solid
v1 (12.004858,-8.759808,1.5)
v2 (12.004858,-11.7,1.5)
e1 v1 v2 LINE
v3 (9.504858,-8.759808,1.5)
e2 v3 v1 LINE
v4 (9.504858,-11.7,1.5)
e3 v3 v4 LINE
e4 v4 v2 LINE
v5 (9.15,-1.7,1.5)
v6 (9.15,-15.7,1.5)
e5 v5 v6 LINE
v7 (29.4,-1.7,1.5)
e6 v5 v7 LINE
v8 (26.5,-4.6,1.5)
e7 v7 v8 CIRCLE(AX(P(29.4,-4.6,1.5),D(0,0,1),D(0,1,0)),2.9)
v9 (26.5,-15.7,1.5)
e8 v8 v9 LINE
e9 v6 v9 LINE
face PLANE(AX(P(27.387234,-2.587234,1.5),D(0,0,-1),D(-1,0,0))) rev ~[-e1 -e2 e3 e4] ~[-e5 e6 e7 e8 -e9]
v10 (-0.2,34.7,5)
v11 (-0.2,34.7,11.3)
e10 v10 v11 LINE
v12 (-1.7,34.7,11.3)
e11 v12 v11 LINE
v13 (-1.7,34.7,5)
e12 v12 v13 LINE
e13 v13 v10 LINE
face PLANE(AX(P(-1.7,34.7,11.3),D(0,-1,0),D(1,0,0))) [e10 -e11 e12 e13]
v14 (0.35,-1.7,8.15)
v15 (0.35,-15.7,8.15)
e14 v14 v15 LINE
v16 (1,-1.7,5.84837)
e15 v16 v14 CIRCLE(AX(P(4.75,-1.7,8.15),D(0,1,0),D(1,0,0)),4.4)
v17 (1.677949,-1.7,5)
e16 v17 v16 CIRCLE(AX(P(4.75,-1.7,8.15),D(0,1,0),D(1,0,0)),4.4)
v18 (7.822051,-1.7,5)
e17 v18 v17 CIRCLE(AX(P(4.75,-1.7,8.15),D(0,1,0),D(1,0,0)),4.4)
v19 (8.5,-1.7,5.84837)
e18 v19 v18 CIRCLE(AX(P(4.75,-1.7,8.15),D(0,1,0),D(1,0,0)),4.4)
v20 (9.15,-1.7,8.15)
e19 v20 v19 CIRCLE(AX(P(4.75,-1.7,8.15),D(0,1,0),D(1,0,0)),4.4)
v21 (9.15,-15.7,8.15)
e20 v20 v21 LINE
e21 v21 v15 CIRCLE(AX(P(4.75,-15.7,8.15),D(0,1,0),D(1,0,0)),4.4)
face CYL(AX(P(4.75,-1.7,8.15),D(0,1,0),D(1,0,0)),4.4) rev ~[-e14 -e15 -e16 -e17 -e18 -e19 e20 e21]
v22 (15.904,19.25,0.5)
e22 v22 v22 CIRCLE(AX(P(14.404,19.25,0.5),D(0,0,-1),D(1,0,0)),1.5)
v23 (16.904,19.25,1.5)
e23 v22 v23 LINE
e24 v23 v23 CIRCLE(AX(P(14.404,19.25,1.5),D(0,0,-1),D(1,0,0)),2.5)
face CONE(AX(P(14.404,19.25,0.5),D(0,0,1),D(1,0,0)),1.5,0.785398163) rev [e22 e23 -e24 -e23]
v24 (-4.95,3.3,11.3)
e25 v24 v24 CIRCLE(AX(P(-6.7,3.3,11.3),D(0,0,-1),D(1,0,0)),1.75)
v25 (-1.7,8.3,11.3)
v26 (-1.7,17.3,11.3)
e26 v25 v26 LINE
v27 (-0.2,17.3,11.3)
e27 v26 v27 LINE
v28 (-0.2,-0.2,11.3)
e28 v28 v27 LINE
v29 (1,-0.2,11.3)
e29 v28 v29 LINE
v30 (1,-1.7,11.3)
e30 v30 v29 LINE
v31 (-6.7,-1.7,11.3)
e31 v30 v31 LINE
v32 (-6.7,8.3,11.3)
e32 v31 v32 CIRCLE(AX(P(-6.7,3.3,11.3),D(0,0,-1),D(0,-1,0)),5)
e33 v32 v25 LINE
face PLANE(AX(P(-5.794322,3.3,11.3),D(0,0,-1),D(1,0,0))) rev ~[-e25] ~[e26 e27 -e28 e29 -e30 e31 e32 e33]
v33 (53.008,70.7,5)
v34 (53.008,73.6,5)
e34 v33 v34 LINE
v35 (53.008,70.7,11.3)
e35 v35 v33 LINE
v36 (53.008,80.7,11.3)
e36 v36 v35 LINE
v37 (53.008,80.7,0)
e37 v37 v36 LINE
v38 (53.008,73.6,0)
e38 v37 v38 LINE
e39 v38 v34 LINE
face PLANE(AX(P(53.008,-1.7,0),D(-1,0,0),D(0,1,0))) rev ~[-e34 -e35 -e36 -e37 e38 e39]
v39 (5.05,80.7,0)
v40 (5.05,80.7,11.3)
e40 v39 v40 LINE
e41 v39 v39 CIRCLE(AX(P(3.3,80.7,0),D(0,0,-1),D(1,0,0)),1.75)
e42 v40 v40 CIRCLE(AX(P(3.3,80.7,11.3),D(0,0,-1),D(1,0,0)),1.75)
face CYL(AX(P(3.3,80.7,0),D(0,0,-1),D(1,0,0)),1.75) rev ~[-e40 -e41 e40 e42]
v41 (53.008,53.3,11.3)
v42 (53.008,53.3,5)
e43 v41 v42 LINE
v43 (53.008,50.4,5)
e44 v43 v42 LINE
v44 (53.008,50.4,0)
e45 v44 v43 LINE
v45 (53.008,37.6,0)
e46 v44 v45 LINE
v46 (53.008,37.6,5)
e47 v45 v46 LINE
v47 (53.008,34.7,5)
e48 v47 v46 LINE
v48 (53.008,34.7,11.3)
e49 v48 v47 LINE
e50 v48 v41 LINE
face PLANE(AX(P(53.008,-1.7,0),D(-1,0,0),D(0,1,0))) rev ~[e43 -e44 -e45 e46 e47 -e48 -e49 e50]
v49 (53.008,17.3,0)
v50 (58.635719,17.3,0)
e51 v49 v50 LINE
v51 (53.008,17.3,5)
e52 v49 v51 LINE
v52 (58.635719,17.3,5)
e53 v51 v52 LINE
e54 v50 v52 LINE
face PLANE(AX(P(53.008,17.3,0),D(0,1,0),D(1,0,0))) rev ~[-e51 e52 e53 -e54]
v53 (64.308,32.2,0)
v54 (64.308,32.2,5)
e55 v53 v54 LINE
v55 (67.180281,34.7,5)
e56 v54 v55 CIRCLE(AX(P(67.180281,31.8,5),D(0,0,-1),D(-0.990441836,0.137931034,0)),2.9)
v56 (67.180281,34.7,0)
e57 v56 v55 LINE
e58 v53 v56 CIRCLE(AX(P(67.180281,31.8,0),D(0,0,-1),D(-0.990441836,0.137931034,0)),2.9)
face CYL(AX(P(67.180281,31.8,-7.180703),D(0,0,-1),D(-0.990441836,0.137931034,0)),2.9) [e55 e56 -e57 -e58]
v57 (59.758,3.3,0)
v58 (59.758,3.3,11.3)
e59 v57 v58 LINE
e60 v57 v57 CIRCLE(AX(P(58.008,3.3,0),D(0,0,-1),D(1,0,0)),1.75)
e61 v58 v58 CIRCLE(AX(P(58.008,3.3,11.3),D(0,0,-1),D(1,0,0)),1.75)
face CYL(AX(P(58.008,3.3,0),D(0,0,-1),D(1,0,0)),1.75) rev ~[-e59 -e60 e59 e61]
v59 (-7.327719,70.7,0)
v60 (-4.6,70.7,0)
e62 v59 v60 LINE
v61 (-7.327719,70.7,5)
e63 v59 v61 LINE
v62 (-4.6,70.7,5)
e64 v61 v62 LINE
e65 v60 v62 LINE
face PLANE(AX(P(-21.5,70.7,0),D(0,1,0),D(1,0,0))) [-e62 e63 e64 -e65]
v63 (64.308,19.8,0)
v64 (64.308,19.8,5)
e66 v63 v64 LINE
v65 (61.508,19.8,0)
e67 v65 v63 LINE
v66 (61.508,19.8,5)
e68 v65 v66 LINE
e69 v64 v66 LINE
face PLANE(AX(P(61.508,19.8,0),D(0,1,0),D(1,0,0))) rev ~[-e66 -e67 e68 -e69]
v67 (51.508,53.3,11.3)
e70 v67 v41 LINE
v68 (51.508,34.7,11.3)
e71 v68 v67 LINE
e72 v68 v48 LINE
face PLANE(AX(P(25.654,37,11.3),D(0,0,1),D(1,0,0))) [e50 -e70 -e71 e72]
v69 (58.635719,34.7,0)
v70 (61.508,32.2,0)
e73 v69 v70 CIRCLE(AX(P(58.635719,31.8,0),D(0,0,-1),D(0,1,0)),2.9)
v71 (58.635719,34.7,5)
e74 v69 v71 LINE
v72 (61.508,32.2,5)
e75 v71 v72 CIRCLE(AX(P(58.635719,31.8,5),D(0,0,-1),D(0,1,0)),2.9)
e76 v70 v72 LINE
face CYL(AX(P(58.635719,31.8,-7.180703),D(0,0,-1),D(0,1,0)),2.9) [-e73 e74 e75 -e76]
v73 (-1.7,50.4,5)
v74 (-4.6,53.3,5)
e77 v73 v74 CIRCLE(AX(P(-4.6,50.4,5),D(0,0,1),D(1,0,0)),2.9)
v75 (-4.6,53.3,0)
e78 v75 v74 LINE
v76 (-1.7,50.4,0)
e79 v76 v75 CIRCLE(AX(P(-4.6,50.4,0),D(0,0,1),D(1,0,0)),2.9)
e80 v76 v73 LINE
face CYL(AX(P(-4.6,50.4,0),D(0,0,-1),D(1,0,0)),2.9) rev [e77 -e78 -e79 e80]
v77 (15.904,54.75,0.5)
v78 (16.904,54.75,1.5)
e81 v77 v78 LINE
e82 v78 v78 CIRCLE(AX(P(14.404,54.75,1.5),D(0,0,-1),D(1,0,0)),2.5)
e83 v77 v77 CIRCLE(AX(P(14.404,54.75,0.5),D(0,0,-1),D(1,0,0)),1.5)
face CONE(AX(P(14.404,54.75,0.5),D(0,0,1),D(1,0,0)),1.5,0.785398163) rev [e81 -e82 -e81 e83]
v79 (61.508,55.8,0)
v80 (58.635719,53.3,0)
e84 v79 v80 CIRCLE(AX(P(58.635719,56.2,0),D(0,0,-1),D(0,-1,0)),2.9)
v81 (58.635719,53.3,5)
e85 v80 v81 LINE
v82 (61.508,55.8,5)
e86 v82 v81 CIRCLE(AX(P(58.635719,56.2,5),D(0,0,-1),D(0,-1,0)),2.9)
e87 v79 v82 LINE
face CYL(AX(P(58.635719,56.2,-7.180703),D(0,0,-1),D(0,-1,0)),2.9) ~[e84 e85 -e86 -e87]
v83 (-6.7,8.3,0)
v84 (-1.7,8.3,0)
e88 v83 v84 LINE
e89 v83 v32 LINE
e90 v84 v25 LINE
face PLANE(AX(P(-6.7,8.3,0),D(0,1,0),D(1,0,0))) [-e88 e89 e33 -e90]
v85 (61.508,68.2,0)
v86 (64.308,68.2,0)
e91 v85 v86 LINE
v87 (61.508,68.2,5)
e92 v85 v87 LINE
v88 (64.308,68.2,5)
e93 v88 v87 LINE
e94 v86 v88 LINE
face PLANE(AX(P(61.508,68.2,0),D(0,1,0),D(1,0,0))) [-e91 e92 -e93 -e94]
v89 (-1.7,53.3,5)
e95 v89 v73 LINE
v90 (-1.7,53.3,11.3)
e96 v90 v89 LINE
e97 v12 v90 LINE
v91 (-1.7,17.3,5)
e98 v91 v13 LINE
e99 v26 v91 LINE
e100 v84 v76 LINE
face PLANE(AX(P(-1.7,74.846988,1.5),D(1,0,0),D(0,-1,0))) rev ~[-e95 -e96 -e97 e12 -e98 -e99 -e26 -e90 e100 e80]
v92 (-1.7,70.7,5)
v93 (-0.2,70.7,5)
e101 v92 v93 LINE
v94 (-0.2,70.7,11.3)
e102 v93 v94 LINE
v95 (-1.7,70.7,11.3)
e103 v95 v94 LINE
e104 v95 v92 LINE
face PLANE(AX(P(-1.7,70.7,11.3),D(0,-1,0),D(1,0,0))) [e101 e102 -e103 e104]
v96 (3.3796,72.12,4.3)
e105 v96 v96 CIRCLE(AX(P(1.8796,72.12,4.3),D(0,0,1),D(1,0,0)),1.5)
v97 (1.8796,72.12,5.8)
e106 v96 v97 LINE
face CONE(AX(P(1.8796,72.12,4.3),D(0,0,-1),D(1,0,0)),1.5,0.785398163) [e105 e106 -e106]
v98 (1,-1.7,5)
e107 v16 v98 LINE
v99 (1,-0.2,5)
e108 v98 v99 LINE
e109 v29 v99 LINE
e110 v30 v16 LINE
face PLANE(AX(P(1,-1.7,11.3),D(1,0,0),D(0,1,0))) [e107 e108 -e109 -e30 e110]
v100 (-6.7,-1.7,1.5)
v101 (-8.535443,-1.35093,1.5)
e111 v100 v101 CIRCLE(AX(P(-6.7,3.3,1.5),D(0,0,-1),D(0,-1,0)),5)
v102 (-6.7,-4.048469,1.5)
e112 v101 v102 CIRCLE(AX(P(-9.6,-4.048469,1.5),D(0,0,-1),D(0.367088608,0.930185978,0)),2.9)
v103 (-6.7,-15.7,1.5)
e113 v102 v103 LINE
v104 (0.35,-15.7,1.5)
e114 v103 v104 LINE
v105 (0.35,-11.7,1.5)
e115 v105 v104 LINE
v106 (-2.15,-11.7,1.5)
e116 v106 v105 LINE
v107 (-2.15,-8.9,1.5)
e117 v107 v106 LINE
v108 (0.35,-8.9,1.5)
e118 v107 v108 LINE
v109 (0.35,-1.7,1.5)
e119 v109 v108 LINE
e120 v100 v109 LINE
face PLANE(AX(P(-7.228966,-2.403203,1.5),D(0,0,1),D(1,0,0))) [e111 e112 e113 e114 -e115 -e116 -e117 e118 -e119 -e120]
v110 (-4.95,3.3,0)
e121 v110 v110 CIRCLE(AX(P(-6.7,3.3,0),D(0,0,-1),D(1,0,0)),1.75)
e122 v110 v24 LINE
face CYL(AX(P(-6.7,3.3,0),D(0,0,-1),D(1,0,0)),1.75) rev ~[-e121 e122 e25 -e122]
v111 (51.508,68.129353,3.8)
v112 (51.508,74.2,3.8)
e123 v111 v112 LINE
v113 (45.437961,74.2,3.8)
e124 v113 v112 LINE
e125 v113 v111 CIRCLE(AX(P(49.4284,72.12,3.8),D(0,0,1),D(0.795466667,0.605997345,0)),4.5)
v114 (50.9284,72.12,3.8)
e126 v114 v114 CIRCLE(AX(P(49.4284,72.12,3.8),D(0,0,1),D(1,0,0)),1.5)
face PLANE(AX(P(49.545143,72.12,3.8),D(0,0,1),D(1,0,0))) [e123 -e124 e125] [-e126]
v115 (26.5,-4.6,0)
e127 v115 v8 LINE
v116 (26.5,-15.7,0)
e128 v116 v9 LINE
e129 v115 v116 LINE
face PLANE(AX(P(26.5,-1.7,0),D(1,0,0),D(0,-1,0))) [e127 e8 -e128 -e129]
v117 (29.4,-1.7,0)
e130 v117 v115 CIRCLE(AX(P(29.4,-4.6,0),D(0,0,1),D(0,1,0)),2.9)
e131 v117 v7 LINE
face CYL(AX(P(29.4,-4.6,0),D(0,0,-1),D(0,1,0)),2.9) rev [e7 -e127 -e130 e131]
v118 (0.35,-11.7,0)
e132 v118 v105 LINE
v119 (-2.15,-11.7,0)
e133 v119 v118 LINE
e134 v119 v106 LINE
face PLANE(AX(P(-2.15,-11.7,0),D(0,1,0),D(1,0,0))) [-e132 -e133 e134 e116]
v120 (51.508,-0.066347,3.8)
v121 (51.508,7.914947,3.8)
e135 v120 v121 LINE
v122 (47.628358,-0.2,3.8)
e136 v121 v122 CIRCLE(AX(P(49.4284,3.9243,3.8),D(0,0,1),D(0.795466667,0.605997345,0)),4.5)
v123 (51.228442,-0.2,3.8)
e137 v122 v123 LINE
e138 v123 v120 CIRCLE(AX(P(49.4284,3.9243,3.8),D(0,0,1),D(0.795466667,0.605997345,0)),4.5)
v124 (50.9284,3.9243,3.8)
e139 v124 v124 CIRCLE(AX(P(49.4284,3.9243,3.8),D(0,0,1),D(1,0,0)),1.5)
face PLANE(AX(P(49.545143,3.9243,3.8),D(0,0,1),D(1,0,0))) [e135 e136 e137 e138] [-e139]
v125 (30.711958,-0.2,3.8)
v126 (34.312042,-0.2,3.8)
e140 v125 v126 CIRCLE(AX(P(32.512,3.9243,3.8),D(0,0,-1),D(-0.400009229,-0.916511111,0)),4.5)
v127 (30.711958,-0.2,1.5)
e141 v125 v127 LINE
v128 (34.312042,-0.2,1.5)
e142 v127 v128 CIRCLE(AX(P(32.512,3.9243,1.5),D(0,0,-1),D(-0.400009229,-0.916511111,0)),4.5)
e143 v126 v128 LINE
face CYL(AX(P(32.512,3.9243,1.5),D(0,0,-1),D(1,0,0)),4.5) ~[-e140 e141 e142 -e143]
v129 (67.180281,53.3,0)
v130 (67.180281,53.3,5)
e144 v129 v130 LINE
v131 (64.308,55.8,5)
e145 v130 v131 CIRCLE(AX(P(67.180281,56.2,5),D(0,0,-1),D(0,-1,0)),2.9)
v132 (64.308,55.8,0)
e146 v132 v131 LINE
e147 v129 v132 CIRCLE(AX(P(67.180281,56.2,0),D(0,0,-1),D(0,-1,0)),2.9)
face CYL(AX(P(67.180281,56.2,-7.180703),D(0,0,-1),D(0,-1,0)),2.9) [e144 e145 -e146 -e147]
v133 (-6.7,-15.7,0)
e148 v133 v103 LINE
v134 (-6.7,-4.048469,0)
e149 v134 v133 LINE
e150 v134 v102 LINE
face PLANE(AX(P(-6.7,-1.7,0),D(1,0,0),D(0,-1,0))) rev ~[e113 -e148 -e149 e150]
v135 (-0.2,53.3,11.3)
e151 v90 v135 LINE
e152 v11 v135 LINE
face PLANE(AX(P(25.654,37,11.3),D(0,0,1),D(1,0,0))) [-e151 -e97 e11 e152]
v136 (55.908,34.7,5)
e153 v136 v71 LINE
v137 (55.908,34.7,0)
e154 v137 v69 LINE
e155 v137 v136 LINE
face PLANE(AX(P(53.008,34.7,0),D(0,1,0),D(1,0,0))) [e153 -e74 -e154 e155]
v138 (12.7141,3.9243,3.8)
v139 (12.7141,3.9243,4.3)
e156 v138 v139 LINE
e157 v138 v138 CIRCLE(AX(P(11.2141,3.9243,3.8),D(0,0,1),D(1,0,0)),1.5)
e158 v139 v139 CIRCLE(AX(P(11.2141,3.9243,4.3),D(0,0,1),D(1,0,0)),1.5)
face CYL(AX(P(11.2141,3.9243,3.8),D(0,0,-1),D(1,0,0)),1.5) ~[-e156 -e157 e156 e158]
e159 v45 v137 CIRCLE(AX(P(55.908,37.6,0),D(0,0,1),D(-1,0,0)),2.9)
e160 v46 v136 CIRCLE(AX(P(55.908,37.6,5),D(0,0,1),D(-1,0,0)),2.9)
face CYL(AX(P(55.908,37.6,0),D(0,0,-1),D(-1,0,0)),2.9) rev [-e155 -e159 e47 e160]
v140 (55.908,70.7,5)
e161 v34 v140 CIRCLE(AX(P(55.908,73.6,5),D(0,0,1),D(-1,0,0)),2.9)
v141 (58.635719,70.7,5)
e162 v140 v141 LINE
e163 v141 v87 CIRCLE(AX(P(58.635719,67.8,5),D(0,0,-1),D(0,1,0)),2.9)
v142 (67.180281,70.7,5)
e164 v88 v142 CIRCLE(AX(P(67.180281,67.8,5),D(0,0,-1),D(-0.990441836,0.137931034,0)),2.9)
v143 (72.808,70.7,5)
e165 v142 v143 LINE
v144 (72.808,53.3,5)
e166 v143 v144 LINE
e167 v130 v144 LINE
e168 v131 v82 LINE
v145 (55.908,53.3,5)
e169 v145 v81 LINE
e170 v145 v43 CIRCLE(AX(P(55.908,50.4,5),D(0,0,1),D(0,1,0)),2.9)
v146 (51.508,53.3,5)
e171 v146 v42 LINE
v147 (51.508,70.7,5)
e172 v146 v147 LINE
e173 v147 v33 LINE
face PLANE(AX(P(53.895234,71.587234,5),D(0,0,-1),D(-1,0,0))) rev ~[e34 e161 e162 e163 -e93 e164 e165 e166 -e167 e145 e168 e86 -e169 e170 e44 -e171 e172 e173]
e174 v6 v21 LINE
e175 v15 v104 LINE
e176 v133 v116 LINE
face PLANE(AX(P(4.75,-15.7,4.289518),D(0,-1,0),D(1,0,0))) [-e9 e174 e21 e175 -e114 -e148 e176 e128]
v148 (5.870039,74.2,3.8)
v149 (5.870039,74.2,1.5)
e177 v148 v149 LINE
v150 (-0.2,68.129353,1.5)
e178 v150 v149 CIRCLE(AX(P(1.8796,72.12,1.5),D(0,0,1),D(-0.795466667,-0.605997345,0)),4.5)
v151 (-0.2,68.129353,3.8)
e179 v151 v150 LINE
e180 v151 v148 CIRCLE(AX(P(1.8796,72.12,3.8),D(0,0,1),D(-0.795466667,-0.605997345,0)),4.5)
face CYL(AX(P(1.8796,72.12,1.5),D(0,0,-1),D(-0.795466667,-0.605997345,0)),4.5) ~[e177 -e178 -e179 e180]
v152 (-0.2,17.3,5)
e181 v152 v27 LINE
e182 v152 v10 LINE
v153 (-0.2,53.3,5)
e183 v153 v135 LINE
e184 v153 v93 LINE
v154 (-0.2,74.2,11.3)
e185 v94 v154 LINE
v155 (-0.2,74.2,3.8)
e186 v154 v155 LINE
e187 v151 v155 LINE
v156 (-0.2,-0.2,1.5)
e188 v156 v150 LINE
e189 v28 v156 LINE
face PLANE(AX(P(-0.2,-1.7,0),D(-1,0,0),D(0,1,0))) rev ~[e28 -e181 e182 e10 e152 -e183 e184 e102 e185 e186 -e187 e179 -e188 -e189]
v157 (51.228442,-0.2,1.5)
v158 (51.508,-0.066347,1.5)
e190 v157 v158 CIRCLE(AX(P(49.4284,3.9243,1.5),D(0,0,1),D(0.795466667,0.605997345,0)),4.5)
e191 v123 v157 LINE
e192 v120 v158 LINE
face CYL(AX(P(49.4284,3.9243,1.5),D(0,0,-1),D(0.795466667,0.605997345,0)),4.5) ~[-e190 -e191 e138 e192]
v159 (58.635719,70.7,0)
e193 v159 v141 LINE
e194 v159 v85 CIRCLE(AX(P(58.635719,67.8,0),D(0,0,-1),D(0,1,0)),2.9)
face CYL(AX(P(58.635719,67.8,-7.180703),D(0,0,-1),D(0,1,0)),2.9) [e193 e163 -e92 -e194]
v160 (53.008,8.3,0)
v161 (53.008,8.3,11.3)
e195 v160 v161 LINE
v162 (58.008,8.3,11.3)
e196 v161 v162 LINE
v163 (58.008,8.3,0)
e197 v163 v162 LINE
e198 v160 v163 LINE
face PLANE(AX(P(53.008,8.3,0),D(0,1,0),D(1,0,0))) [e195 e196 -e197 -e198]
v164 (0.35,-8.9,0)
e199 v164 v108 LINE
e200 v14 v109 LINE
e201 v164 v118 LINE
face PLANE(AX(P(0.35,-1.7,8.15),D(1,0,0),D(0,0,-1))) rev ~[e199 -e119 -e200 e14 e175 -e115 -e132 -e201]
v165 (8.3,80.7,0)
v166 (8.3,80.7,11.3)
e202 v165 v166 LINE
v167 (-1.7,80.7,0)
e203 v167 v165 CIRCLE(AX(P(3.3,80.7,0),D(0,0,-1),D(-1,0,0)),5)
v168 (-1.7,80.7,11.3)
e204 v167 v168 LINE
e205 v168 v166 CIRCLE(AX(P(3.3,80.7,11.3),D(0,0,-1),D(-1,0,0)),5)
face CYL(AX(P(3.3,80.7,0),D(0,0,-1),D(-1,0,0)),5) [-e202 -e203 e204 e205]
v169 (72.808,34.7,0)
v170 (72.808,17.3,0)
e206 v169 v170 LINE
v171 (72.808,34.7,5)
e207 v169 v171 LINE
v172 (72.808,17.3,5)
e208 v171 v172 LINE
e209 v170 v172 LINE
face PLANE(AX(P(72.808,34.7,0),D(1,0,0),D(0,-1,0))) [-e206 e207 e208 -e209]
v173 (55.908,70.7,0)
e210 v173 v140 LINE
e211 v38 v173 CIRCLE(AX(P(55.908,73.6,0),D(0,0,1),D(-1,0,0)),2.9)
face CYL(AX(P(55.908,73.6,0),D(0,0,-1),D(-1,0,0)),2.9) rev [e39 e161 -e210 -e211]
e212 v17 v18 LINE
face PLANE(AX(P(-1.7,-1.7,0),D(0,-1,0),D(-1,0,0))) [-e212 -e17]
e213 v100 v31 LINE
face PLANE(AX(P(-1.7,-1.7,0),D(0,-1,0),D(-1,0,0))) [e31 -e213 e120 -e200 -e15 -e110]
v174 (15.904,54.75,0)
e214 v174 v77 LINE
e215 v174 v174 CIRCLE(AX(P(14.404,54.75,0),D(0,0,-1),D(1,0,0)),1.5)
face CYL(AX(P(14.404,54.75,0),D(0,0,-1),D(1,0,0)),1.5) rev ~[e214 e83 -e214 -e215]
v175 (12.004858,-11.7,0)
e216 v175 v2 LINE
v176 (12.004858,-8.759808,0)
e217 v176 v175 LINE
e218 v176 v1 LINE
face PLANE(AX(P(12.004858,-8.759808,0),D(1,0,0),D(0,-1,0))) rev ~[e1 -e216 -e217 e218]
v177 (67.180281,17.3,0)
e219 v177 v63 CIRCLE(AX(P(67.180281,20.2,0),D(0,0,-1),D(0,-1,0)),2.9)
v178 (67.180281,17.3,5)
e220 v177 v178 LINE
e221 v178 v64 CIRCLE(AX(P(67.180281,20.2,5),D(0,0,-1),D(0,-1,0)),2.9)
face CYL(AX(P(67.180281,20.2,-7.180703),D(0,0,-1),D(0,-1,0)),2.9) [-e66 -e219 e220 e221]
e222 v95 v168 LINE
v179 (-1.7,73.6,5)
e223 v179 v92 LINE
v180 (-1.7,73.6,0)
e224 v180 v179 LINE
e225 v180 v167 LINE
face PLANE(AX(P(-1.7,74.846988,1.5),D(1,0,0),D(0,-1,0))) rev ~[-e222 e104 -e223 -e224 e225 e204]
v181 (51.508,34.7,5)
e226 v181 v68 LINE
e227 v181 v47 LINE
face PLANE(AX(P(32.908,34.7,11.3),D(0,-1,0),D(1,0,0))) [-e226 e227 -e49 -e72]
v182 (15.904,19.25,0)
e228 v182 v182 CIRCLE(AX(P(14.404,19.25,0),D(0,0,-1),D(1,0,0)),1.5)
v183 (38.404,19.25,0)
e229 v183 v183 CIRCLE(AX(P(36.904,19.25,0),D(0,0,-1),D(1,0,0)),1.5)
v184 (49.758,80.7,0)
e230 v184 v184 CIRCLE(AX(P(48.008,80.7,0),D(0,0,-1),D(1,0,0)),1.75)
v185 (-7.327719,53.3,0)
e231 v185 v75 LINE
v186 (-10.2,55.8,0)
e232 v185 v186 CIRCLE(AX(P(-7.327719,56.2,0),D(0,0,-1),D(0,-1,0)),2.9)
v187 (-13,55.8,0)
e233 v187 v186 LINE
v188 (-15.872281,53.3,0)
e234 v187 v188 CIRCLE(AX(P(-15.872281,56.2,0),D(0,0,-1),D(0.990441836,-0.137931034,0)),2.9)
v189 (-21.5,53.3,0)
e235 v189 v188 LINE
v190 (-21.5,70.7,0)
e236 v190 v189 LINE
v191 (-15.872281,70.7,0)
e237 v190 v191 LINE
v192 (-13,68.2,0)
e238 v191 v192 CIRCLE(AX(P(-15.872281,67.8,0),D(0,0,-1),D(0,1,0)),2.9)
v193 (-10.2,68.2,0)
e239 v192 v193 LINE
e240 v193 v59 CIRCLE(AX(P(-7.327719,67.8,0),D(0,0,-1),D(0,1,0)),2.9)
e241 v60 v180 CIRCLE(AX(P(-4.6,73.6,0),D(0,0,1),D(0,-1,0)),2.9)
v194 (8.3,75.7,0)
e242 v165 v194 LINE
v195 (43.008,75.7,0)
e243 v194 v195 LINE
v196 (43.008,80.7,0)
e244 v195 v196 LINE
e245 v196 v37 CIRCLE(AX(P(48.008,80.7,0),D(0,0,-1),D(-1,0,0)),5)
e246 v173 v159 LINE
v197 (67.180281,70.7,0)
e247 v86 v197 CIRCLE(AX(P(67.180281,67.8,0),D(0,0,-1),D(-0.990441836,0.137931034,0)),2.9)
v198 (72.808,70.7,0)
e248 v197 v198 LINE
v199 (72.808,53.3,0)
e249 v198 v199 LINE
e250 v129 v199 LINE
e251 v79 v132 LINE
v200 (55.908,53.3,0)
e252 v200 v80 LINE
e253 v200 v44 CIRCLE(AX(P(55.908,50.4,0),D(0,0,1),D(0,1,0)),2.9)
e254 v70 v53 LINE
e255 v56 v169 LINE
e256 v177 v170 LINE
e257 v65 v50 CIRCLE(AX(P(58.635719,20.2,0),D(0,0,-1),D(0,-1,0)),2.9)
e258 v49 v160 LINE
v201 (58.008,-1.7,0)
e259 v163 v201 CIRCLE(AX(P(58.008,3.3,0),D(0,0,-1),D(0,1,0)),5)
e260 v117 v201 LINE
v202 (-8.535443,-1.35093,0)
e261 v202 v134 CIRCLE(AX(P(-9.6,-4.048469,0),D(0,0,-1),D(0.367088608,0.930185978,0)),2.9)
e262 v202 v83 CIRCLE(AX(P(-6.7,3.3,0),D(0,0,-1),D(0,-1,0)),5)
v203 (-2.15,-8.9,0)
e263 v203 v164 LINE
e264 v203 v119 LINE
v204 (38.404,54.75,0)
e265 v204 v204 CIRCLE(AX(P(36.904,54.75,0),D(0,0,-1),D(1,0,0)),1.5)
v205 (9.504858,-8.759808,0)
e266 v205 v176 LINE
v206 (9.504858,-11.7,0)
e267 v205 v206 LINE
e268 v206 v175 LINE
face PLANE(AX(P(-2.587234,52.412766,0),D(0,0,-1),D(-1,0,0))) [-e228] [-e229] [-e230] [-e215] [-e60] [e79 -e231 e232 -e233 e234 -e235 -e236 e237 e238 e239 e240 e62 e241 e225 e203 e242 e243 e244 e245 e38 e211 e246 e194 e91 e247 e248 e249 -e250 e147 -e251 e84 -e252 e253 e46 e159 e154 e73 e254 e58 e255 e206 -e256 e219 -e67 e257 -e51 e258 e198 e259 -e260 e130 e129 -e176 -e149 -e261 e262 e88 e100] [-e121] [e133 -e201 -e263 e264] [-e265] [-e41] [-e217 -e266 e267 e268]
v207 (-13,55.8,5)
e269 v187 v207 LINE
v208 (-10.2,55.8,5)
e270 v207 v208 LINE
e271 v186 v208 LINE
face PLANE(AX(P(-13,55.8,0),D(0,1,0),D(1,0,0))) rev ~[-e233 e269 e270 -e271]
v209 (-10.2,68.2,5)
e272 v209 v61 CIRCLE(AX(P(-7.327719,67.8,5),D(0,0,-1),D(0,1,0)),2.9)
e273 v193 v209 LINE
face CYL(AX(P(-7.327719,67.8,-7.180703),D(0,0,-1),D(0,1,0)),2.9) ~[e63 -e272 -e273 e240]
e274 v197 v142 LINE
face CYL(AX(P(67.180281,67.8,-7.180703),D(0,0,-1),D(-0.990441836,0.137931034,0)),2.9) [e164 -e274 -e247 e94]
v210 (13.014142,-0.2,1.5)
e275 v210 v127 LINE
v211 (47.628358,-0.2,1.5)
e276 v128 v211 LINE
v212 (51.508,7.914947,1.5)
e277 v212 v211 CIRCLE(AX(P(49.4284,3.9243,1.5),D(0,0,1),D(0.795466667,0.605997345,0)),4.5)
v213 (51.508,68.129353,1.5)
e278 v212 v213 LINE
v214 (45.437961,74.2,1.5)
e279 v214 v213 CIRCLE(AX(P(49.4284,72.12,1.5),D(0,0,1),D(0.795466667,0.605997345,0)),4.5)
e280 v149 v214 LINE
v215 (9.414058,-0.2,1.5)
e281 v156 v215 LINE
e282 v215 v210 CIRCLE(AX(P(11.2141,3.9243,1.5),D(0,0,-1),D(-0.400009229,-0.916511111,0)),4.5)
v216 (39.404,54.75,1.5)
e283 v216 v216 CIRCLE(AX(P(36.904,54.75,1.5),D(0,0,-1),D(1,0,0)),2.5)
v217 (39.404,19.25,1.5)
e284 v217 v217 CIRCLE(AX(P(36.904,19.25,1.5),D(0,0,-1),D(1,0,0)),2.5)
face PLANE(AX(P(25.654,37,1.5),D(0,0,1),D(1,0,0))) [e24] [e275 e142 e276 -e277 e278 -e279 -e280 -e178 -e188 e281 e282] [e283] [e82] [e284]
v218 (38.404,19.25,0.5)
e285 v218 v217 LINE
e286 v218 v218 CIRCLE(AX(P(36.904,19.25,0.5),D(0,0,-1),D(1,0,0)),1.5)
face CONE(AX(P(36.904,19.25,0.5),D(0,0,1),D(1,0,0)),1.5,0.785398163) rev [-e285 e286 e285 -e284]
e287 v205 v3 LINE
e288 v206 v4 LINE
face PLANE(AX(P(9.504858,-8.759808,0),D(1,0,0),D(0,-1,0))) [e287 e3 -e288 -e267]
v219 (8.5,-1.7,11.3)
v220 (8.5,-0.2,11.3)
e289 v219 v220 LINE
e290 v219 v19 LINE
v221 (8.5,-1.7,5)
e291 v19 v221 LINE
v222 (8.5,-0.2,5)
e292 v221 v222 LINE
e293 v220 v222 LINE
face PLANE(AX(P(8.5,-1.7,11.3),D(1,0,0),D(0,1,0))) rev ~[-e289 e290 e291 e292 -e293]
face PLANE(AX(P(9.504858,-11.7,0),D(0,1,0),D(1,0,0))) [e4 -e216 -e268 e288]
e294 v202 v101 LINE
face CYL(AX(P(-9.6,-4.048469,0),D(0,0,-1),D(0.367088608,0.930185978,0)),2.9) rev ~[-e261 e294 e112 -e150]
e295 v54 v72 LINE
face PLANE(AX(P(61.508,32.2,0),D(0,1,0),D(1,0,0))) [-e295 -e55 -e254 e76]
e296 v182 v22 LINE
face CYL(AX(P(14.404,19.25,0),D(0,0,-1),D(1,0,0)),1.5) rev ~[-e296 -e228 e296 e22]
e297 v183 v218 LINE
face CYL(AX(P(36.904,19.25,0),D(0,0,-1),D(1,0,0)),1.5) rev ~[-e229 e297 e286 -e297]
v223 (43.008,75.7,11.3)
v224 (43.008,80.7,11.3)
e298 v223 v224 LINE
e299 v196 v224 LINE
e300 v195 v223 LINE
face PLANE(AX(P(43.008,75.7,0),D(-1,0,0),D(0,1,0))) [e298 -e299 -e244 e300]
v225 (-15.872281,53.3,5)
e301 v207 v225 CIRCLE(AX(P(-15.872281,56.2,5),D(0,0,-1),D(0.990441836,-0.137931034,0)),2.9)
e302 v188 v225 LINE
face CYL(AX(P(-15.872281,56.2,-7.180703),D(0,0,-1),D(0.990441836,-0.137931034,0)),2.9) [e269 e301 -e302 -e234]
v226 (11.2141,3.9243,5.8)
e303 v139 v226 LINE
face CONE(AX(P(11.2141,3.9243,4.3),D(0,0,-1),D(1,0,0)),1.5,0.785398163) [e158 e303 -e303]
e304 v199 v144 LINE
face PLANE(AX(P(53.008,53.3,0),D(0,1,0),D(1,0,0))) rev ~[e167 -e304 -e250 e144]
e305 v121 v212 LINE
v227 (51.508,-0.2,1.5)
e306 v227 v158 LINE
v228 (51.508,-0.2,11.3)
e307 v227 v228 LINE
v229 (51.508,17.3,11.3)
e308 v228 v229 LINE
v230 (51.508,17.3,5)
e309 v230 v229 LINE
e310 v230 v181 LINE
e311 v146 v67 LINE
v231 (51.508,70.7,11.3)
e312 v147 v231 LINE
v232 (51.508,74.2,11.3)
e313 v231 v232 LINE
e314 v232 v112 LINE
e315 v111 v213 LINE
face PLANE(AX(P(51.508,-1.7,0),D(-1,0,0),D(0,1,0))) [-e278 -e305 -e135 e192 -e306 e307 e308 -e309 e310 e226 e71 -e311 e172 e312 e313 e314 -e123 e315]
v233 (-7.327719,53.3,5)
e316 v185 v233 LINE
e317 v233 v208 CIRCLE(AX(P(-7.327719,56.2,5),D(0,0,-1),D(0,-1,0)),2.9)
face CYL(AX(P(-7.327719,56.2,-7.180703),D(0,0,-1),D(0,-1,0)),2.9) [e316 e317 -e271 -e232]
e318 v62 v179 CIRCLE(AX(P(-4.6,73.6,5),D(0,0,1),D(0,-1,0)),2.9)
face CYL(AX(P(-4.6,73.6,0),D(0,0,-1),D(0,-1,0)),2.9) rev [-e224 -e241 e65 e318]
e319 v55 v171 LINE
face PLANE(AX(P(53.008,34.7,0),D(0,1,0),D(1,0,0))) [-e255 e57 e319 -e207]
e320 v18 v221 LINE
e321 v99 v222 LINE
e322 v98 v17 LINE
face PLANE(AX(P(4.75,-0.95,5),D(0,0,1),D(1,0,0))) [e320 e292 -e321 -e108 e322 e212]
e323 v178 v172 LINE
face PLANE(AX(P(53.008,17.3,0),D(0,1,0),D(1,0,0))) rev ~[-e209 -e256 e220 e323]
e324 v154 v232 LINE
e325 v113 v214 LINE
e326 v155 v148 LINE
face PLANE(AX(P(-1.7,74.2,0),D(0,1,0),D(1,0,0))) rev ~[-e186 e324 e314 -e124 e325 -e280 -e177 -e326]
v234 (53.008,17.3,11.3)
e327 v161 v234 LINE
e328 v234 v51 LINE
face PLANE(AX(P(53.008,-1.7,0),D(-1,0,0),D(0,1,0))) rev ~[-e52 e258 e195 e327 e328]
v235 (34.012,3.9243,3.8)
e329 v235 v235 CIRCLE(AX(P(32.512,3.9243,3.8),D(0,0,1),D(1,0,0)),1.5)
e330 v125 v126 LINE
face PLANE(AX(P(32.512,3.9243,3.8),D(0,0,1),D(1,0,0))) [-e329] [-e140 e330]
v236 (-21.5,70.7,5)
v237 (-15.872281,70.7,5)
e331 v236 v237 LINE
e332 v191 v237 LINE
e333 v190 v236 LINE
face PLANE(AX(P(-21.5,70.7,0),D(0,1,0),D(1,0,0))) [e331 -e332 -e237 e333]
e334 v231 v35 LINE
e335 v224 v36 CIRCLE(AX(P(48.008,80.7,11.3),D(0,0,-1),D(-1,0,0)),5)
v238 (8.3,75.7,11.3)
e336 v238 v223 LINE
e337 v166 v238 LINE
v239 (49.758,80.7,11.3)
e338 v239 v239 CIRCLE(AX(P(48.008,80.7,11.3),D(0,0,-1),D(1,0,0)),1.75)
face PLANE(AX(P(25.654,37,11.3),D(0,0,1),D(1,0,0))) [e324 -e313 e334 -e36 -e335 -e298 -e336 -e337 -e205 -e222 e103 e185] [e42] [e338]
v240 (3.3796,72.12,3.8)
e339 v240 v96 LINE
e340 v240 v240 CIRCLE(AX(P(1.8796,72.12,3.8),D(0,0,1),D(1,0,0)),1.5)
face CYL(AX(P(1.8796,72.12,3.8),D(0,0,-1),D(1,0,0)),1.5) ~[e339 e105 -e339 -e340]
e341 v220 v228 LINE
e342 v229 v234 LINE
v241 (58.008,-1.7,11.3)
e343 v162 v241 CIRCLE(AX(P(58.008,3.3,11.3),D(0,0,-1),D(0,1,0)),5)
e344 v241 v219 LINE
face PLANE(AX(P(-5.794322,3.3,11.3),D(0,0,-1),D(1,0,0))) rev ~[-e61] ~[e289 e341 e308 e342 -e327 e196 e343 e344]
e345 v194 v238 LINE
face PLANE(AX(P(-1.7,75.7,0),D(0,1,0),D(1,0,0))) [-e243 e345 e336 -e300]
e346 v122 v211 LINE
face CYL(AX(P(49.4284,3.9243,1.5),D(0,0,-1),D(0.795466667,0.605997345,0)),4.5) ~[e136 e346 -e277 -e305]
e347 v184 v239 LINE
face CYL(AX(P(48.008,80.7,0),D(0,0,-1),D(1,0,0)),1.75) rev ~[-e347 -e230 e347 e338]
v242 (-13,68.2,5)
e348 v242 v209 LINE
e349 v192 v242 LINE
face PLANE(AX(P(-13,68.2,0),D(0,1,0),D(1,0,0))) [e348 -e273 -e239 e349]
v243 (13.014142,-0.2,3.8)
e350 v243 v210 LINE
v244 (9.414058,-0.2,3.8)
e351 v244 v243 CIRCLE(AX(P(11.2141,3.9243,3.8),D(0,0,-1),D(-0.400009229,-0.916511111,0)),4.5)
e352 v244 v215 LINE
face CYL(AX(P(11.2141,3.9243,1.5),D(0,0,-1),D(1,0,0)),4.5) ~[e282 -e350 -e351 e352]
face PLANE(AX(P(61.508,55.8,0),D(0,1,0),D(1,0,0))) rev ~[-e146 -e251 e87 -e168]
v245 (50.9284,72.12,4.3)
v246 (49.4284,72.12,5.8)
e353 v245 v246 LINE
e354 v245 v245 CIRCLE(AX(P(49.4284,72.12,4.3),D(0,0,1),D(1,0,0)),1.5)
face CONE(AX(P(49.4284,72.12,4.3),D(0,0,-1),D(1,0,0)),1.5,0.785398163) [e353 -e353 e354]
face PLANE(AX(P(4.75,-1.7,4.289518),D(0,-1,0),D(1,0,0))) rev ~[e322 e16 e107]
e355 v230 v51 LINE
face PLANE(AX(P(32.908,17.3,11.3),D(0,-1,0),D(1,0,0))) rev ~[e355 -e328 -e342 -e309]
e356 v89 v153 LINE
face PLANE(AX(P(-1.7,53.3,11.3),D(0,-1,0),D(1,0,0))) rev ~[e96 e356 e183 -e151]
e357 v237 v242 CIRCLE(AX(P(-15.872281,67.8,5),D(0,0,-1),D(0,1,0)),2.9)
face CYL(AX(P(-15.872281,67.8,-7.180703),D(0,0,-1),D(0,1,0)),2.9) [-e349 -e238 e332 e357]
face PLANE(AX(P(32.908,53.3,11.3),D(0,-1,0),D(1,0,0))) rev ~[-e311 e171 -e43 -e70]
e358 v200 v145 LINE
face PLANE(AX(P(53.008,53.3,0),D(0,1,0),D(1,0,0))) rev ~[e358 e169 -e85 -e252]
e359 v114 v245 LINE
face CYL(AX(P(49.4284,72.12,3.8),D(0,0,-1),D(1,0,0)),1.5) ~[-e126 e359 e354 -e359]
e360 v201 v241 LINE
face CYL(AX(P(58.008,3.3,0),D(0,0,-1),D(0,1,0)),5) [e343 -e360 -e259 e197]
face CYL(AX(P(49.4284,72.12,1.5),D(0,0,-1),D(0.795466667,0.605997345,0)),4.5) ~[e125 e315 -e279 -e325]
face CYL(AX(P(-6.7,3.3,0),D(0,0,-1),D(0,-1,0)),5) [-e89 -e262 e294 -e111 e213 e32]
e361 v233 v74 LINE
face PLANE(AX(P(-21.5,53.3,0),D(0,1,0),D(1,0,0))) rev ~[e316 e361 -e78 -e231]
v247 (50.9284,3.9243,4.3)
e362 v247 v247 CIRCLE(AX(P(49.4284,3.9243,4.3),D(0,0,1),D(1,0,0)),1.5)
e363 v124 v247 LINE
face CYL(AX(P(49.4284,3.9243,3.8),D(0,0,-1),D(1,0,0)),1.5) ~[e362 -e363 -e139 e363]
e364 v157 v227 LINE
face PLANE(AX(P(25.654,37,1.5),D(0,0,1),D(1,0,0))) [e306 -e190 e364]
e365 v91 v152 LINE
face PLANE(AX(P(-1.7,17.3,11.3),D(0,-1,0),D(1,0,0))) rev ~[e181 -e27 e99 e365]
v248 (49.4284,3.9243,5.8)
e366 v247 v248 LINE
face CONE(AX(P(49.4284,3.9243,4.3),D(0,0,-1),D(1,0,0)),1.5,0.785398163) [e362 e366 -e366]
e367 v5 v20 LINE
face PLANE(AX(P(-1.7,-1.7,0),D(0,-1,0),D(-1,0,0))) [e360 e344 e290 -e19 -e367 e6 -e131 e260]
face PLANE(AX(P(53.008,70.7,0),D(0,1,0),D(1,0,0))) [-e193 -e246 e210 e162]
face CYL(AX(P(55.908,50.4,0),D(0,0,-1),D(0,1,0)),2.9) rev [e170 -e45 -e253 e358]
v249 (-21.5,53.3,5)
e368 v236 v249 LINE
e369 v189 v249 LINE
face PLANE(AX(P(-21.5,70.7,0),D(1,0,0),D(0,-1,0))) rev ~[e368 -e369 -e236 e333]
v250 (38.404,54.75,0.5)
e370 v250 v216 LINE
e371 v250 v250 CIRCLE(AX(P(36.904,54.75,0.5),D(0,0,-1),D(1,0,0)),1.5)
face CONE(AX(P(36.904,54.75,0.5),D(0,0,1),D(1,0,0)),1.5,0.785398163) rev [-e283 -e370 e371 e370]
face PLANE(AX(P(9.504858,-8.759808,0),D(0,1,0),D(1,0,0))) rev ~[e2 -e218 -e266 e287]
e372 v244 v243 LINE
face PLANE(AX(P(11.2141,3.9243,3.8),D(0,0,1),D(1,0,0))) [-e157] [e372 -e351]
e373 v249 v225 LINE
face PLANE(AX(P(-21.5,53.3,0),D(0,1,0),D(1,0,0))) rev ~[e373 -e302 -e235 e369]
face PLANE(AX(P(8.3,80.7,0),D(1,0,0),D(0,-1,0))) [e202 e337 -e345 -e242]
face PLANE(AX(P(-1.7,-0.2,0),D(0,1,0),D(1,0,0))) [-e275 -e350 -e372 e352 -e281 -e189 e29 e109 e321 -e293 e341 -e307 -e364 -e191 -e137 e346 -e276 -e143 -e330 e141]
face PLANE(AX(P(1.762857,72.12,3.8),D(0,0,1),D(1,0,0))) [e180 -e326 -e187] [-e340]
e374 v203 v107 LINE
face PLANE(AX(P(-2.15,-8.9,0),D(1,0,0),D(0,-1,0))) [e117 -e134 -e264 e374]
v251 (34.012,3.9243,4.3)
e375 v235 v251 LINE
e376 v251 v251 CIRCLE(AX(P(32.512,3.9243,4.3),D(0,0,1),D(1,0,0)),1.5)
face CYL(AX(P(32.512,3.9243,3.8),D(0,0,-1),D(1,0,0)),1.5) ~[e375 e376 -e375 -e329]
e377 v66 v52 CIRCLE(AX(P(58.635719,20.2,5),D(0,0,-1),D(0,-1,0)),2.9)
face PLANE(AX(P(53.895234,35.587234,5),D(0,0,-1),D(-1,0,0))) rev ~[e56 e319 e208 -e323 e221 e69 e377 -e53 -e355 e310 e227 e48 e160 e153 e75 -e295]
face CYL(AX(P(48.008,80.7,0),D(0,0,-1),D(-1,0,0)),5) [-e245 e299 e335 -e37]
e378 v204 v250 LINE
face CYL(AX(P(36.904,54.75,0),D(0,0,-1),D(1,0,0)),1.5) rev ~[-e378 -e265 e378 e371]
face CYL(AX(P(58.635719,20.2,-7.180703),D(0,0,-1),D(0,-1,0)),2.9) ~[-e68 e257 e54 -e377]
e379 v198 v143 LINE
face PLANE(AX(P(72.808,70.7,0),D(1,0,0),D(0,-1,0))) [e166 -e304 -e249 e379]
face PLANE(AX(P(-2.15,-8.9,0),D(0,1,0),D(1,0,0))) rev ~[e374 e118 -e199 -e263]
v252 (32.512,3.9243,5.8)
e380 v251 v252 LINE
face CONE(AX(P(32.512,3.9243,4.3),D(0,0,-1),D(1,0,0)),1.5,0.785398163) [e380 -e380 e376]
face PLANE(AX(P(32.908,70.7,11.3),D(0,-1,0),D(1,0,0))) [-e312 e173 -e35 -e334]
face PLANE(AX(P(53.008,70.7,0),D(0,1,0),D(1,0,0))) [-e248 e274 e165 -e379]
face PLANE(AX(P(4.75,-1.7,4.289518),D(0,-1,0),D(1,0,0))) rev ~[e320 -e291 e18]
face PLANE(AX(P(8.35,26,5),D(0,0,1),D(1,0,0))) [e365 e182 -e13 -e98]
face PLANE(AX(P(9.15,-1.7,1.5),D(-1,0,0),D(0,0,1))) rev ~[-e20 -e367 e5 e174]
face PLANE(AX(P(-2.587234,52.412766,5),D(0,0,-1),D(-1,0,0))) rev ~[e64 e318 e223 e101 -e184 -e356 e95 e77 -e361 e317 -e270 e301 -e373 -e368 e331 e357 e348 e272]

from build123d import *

# Parameters (mm, degrees)
F1_W          = 54.708
F1_H          = 77.4
F2_DEPTH      = 11.3
F3_T          = -1.5
F4_W          = 20.1
F4_H          = 17.4
F5_DEPTH      = 6.3
F6_R          = 4.5
F7_DEPTH      = 2.3
F8_R          = 1.5
F9_DEPTH      = 11.301
F10_SIZE      = 1
F11_R         = 1.75
F12_DEPTH     = 11.3
F13_R         = 1.5
F14_DEPTH     = 2
F15_SIZE      = 1.5
F16_W         = 7.5
F16_H         = 1.5
F17_DEPTH     = 6.3
F18_W         = 19.8
F18_H         = 17.4
F19_DEPTH     = 5
F20_W         = 33.2
F20_H         = 14
F21_DEPTH     = 1.5
F23_DEPTH     = 14
F24_W         = 2.5
F24_H         = 2.8
F24_W_2       = 2.8
F24_H_2       = 2.5
F24_W_3       = 2.5000000001
F24_H_3       = 2.940192353
F25_DEPTH     = 11.301
F26_T1_DEPTH  = 1.5
F26_T3_DEPTH  = 1.5
F26_T5_DEPTH  = 5
F26_T7_DEPTH  = 5
F26_T9_DEPTH  = 5
F26_T11_DEPTH = 5
F26_T13_DEPTH = 5
F26_T15_DEPTH = 19.3614066163
F26_T17_DEPTH = 19.3614066163
F26_T19_DEPTH = 19.3614066163
F26_T21_DEPTH = 19.3614066163
F26_T23_DEPTH = 19.3614066163
F26_T25_DEPTH = 19.3614066163
F26_T27_DEPTH = 19.3614066163
F26_T29_DEPTH = 19.3614066163
F26_T31_DEPTH = 19.3614066163
F26_T33_DEPTH = 19.3614066163
F26_T35_DEPTH = 19.3614066163
F26_T37_DEPTH = 19.3614066163


# Not quite as in the source:
# - a fillet or chamfer that OpenCascade refuses, or shapes differently, is made with other operations: its cross-section is extruded or revolved along the edge and cut away or added


with BuildPart() as f2:
    # F1 (on face) → F2 (new body)
    with BuildSketch(Plane.XY):
        with Locations((25.654, 37)):
            Rectangle(F1_W, F1_H)
    extrude(amount=F2_DEPTH)

    # F3
    f3_openings = [f2.faces().sort_by_distance(p)[0] for p in [
        (25.654, 37, 11.3),
    ]]
    offset(amount=F3_T, openings=f3_openings)

    # F4 (on face) → F5 (cut, through all)
    with BuildSketch(Plane.XY.offset(11.3)):
        with Locations((8.35, 26)):
            Rectangle(F4_W, F4_H)
        with Locations((42.958, 26)):
            Rectangle(F4_W, F4_H)
        with Locations((8.35, 62)):
            Rectangle(F4_W, F4_H)
        with Locations((42.958, 62)):
            Rectangle(F4_W, F4_H)
    extrude(amount=-F5_DEPTH, mode=Mode.SUBTRACT)

    # F6 (on face) → F7 (join, through all)
    with BuildSketch(Plane.XY.offset(1.5)):
        with BuildLine():
            Line((-1.7, 74.8469880528), (-1.7, 69.3930119472))
            ThreePointArc((-1.7, 69.3930119472), (6.3796, 72.12), (-1.7, 74.8469880528))
        make_face()
        with BuildLine():
            Line((53.008, 69.3930119472), (53.008, 74.8469880528))
            ThreePointArc((53.008, 74.8469880528), (44.9284, 72.12), (53.008, 69.3930119472))
        make_face()
        with Locations((11.2141, 3.9243)):
            Circle(F6_R)
        with Locations((32.512, 3.9243)):
            Circle(F6_R)
        with BuildLine():
            Line((53.008, 1.1973119472), (53.008, 6.6512880528))
            ThreePointArc((53.008, 6.6512880528), (44.9284, 3.9243), (53.008, 1.1973119472))
        make_face()
    extrude(amount=F7_DEPTH)

    # F8 (on face) → F9 (cut, through all)
    with BuildSketch(Plane(origin=(0, 0, 0), x_dir=(1, 0, 0), z_dir=(0, 0, -1))):
        with Locations((14.404, -54.75)):
            Circle(F8_R)
        with Locations((14.404, -19.25)):
            Circle(F8_R)
        with Locations((36.904, -19.25)):
            Circle(F8_R)
        with Locations((36.904, -54.75)):
            Circle(F8_R)
    extrude(amount=-F9_DEPTH, mode=Mode.SUBTRACT)

    # F10
    f10_edges = [f2.edges().sort_by_distance(p)[0] for p in [
        (35.404, 54.75, 1.5),
        (12.904, 54.75, 1.5),
        (35.404, 19.25, 1.5),
        (12.904, 19.25, 1.5),
    ]]
    chamfer(f10_edges, length=F10_SIZE)

    # F11 (on face) → F12 (join, through all)
    with BuildSketch(Plane(origin=(0, 0, 0), x_dir=(1, 0, 0), z_dir=(0, 0, -1))):
        with BuildLine():
            Line((-1.7, 1.7), (-6.7, 1.7))
            ThreePointArc((-6.7, 1.7), (-11.7, -3.3), (-6.7, -8.3))
            Line((-6.7, -8.3), (-1.7, -8.3))
            Line((-1.7, -8.3), (-1.7, 1.7))
        make_face()
        with Locations((-6.7, -3.3)):
            Circle(F11_R, mode=Mode.SUBTRACT)
        with BuildLine():
            Line((-1.7, -75.7), (-1.7, -80.7))
            ThreePointArc((-1.7, -80.7), (3.3, -85.7), (8.3, -80.7))
            Line((8.3, -80.7), (8.3, -75.7))
            Line((8.3, -75.7), (-1.7, -75.7))
        make_face()
        with Locations((3.3, -80.7)):
            Circle(F11_R, mode=Mode.SUBTRACT)
        with BuildLine():
            Line((53.008, -8.3), (58.008, -8.3))
            ThreePointArc((58.008, -8.3), (63.008, -3.3), (58.008, 1.7))
            Line((58.008, 1.7), (53.008, 1.7))
            Line((53.008, 1.7), (53.008, -8.3))
        make_face()
        with Locations((58.008, -3.3)):
            Circle(F11_R, mode=Mode.SUBTRACT)
        with BuildLine():
            Line((43.008, -75.7), (43.008, -80.7))
            ThreePointArc((43.008, -80.7), (48.008, -85.7), (53.008, -80.7))
            Line((53.008, -80.7), (53.008, -75.7))
            Line((53.008, -75.7), (43.008, -75.7))
        make_face()
        with Locations((48.008, -80.7)):
            Circle(F11_R, mode=Mode.SUBTRACT)
    extrude(amount=-F12_DEPTH)

    # F13 (on face) → F14 (join)
    with BuildSketch(Plane.XY.offset(3.8)):
        with Locations((49.4284, 3.9243)):
            Circle(F13_R)
        with Locations((32.512, 3.9243)):
            Circle(F13_R)
        with Locations((11.2141, 3.9243)):
            Circle(F13_R)
        with Locations((49.4284, 72.12)):
            Circle(F13_R)
        with Locations((1.8796, 72.12)):
            Circle(F13_R)
    extrude(amount=F14_DEPTH)

    # F15
    f15_edges = [f2.edges().sort_by_distance(p)[0] for p in [
        (47.9284, 3.9243, 5.8),
        (31.012, 3.9243, 5.8),
        (9.7141, 3.9243, 5.8),
        (47.9284, 72.12, 5.8),
        (0.3796, 72.12, 5.8),
    ]]
    chamfer(f15_edges, length=F15_SIZE)

    # F16 (on face) → F17 (cut, through all)
    with BuildSketch(Plane.XY.offset(11.3)):
        with Locations((4.75, -0.95)):
            Rectangle(F16_W, F16_H)
    extrude(amount=-F17_DEPTH, mode=Mode.SUBTRACT)

    # F18 (on face) → F19 (join, through all)
    with BuildSketch(Plane(origin=(0, 0, 0), x_dir=(1, 0, 0), z_dir=(0, 0, -1))):
        with Locations((-11.6, -62)):
            Rectangle(F18_W, F18_H)
        with Locations((62.908, -62)):
            Rectangle(F18_W, F18_H)
        with Locations((62.908, -26)):
            Rectangle(F18_W, F18_H)
    extrude(amount=-F19_DEPTH)

    # F20 (on face) → F21 (join)
    with BuildSketch(Plane(origin=(0, 0, 0), x_dir=(1, 0, 0), z_dir=(0, 0, -1))):
        with Locations((9.9, 8.7)):
            Rectangle(F20_W, F20_H)
    extrude(amount=-F21_DEPTH)

    # F22 (on face) → F23 (join, through all)
    with BuildSketch(Plane.XZ.offset(1.7)):
        with BuildLine():
            ThreePointArc((9.15, 8.1499999998), (4.75, 3.7499999995), (0.35, 8.1499999998))
            Line((0.35, 8.1499999998), (0.35, 1.5))
            Line((0.35, 1.5), (9.15, 1.5))
            Line((9.15, 1.5), (9.15, 8.1499999998))
        make_face()
    extrude(amount=F23_DEPTH)

    # F24 (on face) → F25 (cut, through all)
    with BuildSketch(Plane(origin=(0, 0, 0), x_dir=(1, 0, 0), z_dir=(0, 0, -1))):
        with Locations((-0.9, 10.3)):
            Rectangle(F24_W, F24_H)
        with Locations((-11.6, -54.55)):
            Rectangle(F24_W_2, F24_H_2)
        with Locations((10.7548580677, 10.2299038235)):
            Rectangle(F24_W_3, F24_H_3)
        with Locations((-11.6, -69.45)):
            Rectangle(F24_W_2, F24_H_2)
        with Locations((62.908, -69.45)):
            Rectangle(F24_W_2, F24_H_2)
        with Locations((62.908, -54.55)):
            Rectangle(F24_W_2, F24_H_2)
        with Locations((62.908, -18.55)):
            Rectangle(F24_W_2, F24_H_2)
        with Locations((62.908, -33.45)):
            Rectangle(F24_W_2, F24_H_2)
    extrude(amount=-F25_DEPTH, mode=Mode.SUBTRACT)

    # F26: fillet of radius 2.9 on 20 edges, made by hand

    # F26_s2 → F26_t1 (join)
    with BuildSketch(Plane.XY):
        with BuildLine():
            ThreePointArc((-8.535443038, -1.3509298914), (-7.2023745924, -2.417091772), (-6.7, -4.0484692283))
            Line((-6.7, -4.0484692283), (-6.7, -1.7))
            ThreePointArc((-6.7, -1.7), (-7.6341709006, -1.6119573215), (-8.535443038, -1.3509298914))
        make_face()
    extrude(amount=F26_T1_DEPTH)

    # F26_s4 → F26_t3 (join)
    with BuildSketch(Plane.XY):
        with BuildLine():
            ThreePointArc((29.4, -1.7), (27.3493903346, -2.5493903346), (26.5, -4.6))
            Line((26.5, -4.6), (26.5, -1.7))
            Line((26.5, -1.7), (29.4, -1.7))
        make_face()
    extrude(amount=F26_T3_DEPTH)

    # F26_s6 → F26_t5 (join)
    with BuildSketch(Plane.XY):
        with BuildLine():
            ThreePointArc((53.008, 37.6), (53.8573903346, 35.5493903346), (55.908, 34.7))
            Line((55.908, 34.7), (53.008, 34.7))
            Line((53.008, 34.7), (53.008, 37.6))
        make_face()
    extrude(amount=F26_T5_DEPTH)

    # F26_s8 → F26_t7 (join)
    with BuildSketch(Plane.XY):
        with BuildLine():
            ThreePointArc((55.908, 53.3), (53.8573903346, 52.4506096654), (53.008, 50.4))
            Line((53.008, 50.4), (53.008, 53.3))
            Line((53.008, 53.3), (55.908, 53.3))
        make_face()
    extrude(amount=F26_T7_DEPTH)

    # F26_s10 → F26_t9 (join)
    with BuildSketch(Plane.XY):
        with BuildLine():
            ThreePointArc((53.008, 73.6), (53.8573903346, 71.5493903346), (55.908, 70.7))
            Line((55.908, 70.7), (53.008, 70.7))
            Line((53.008, 70.7), (53.008, 73.6))
        make_face()
    extrude(amount=F26_T9_DEPTH)

    # F26_s12 → F26_t11 (join)
    with BuildSketch(Plane.XY):
        with BuildLine():
            ThreePointArc((-4.6, 70.7), (-2.5493903346, 71.5493903346), (-1.7, 73.6))
            Line((-1.7, 73.6), (-1.7, 70.7))
            Line((-1.7, 70.7), (-4.6, 70.7))
        make_face()
    extrude(amount=F26_T11_DEPTH)

    # F26_s14 → F26_t13 (join)
    with BuildSketch(Plane.XY):
        with BuildLine():
            ThreePointArc((-1.7, 50.4), (-2.5493903346, 52.4506096654), (-4.6, 53.3))
            Line((-4.6, 53.3), (-1.7, 53.3))
            Line((-1.7, 53.3), (-1.7, 50.4))
        make_face()
    extrude(amount=F26_T13_DEPTH)

    # F26_s16 → F26_t15 (cut)
    with BuildSketch(Plane.XY.offset(-7.1807033082)):
        with BuildLine():
            ThreePointArc((58.6357186767, 17.3), (60.5396619532, 18.0125357146), (61.508, 19.8))
            Line((61.508, 19.8), (61.508, 17.3))
            Line((61.508, 17.3), (58.6357186767, 17.3))
        make_face()
    extrude(amount=F26_T15_DEPTH, mode=Mode.SUBTRACT)

    # F26_s18 → F26_t17 (cut)
    with BuildSketch(Plane.XY.offset(-7.1807033082)):
        with BuildLine():
            ThreePointArc((67.1802813233, 17.3), (65.2763380468, 18.0125357146), (64.308, 19.8))
            Line((64.308, 19.8), (64.308, 17.3))
            Line((64.308, 17.3), (67.1802813233, 17.3))
        make_face()
    extrude(amount=F26_T17_DEPTH, mode=Mode.SUBTRACT)

    # F26_s20 → F26_t19 (cut)
    with BuildSketch(Plane.XY.offset(-7.1807033082)):
        with BuildLine():
            ThreePointArc((64.308, 32.2), (65.2763380468, 33.9874642854), (67.1802813233, 34.7))
            Line((67.1802813233, 34.7), (64.308, 34.7))
            Line((64.308, 34.7), (64.308, 32.2))
        make_face()
    extrude(amount=F26_T19_DEPTH, mode=Mode.SUBTRACT)

    # F26_s22 → F26_t21 (cut)
    with BuildSketch(Plane.XY.offset(-7.1807033082)):
        with BuildLine():
            ThreePointArc((58.6357186767, 34.7), (60.5396619532, 33.9874642854), (61.508, 32.2))
            Line((61.508, 32.2), (61.508, 34.7))
            Line((61.508, 34.7), (58.6357186767, 34.7))
        make_face()
    extrude(amount=F26_T21_DEPTH, mode=Mode.SUBTRACT)

    # F26_s24 → F26_t23 (cut)
    with BuildSketch(Plane.XY.offset(-7.1807033082)):
        with BuildLine():
            ThreePointArc((58.6357186767, 53.3), (60.5396619532, 54.0125357146), (61.508, 55.8))
            Line((61.508, 55.8), (61.508, 53.3))
            Line((61.508, 53.3), (58.6357186767, 53.3))
        make_face()
    extrude(amount=F26_T23_DEPTH, mode=Mode.SUBTRACT)

    # F26_s26 → F26_t25 (cut)
    with BuildSketch(Plane.XY.offset(-7.1807033082)):
        with BuildLine():
            ThreePointArc((67.1802813233, 53.3), (65.2763380468, 54.0125357146), (64.308, 55.8))
            Line((64.308, 55.8), (64.308, 53.3))
            Line((64.308, 53.3), (67.1802813233, 53.3))
        make_face()
    extrude(amount=F26_T25_DEPTH, mode=Mode.SUBTRACT)

    # F26_s28 → F26_t27 (cut)
    with BuildSketch(Plane.XY.offset(-7.1807033082)):
        with BuildLine():
            ThreePointArc((64.308, 68.2), (65.2763380468, 69.9874642854), (67.1802813233, 70.7))
            Line((67.1802813233, 70.7), (64.308, 70.7))
            Line((64.308, 70.7), (64.308, 68.2))
        make_face()
    extrude(amount=F26_T27_DEPTH, mode=Mode.SUBTRACT)

    # F26_s30 → F26_t29 (cut)
    with BuildSketch(Plane.XY.offset(-7.1807033082)):
        with BuildLine():
            ThreePointArc((58.6357186767, 70.7), (60.5396619532, 69.9874642854), (61.508, 68.2))
            Line((61.508, 68.2), (61.508, 70.7))
            Line((61.508, 70.7), (58.6357186767, 70.7))
        make_face()
    extrude(amount=F26_T29_DEPTH, mode=Mode.SUBTRACT)

    # F26_s32 → F26_t31 (cut)
    with BuildSketch(Plane.XY.offset(-7.1807033082)):
        with BuildLine():
            ThreePointArc((-7.3277186767, 70.7), (-9.2316619532, 69.9874642854), (-10.2, 68.2))
            Line((-10.2, 68.2), (-10.2, 70.7))
            Line((-10.2, 70.7), (-7.3277186767, 70.7))
        make_face()
    extrude(amount=F26_T31_DEPTH, mode=Mode.SUBTRACT)

    # F26_s34 → F26_t33 (cut)
    with BuildSketch(Plane.XY.offset(-7.1807033082)):
        with BuildLine():
            ThreePointArc((-15.8722813233, 70.7), (-13.9683380468, 69.9874642854), (-13, 68.2))
            Line((-13, 68.2), (-13, 70.7))
            Line((-13, 70.7), (-15.8722813233, 70.7))
        make_face()
    extrude(amount=F26_T33_DEPTH, mode=Mode.SUBTRACT)

    # F26_s36 → F26_t35 (cut)
    with BuildSketch(Plane.XY.offset(-7.1807033082)):
        with BuildLine():
            ThreePointArc((-13, 55.8), (-13.9683380468, 54.0125357146), (-15.8722813233, 53.3))
            Line((-15.8722813233, 53.3), (-13, 53.3))
            Line((-13, 53.3), (-13, 55.8))
        make_face()
    extrude(amount=F26_T35_DEPTH, mode=Mode.SUBTRACT)

    # F26_s38 → F26_t37 (cut)
    with BuildSketch(Plane.XY.offset(-7.1807033082)):
        with BuildLine():
            ThreePointArc((-7.3277186767, 53.3), (-9.2316619532, 54.0125357146), (-10.2, 55.8))
            Line((-10.2, 55.8), (-10.2, 53.3))
            Line((-10.2, 53.3), (-7.3277186767, 53.3))
        make_face()
    extrude(amount=F26_T37_DEPTH, mode=Mode.SUBTRACT)


solid = f2.part
